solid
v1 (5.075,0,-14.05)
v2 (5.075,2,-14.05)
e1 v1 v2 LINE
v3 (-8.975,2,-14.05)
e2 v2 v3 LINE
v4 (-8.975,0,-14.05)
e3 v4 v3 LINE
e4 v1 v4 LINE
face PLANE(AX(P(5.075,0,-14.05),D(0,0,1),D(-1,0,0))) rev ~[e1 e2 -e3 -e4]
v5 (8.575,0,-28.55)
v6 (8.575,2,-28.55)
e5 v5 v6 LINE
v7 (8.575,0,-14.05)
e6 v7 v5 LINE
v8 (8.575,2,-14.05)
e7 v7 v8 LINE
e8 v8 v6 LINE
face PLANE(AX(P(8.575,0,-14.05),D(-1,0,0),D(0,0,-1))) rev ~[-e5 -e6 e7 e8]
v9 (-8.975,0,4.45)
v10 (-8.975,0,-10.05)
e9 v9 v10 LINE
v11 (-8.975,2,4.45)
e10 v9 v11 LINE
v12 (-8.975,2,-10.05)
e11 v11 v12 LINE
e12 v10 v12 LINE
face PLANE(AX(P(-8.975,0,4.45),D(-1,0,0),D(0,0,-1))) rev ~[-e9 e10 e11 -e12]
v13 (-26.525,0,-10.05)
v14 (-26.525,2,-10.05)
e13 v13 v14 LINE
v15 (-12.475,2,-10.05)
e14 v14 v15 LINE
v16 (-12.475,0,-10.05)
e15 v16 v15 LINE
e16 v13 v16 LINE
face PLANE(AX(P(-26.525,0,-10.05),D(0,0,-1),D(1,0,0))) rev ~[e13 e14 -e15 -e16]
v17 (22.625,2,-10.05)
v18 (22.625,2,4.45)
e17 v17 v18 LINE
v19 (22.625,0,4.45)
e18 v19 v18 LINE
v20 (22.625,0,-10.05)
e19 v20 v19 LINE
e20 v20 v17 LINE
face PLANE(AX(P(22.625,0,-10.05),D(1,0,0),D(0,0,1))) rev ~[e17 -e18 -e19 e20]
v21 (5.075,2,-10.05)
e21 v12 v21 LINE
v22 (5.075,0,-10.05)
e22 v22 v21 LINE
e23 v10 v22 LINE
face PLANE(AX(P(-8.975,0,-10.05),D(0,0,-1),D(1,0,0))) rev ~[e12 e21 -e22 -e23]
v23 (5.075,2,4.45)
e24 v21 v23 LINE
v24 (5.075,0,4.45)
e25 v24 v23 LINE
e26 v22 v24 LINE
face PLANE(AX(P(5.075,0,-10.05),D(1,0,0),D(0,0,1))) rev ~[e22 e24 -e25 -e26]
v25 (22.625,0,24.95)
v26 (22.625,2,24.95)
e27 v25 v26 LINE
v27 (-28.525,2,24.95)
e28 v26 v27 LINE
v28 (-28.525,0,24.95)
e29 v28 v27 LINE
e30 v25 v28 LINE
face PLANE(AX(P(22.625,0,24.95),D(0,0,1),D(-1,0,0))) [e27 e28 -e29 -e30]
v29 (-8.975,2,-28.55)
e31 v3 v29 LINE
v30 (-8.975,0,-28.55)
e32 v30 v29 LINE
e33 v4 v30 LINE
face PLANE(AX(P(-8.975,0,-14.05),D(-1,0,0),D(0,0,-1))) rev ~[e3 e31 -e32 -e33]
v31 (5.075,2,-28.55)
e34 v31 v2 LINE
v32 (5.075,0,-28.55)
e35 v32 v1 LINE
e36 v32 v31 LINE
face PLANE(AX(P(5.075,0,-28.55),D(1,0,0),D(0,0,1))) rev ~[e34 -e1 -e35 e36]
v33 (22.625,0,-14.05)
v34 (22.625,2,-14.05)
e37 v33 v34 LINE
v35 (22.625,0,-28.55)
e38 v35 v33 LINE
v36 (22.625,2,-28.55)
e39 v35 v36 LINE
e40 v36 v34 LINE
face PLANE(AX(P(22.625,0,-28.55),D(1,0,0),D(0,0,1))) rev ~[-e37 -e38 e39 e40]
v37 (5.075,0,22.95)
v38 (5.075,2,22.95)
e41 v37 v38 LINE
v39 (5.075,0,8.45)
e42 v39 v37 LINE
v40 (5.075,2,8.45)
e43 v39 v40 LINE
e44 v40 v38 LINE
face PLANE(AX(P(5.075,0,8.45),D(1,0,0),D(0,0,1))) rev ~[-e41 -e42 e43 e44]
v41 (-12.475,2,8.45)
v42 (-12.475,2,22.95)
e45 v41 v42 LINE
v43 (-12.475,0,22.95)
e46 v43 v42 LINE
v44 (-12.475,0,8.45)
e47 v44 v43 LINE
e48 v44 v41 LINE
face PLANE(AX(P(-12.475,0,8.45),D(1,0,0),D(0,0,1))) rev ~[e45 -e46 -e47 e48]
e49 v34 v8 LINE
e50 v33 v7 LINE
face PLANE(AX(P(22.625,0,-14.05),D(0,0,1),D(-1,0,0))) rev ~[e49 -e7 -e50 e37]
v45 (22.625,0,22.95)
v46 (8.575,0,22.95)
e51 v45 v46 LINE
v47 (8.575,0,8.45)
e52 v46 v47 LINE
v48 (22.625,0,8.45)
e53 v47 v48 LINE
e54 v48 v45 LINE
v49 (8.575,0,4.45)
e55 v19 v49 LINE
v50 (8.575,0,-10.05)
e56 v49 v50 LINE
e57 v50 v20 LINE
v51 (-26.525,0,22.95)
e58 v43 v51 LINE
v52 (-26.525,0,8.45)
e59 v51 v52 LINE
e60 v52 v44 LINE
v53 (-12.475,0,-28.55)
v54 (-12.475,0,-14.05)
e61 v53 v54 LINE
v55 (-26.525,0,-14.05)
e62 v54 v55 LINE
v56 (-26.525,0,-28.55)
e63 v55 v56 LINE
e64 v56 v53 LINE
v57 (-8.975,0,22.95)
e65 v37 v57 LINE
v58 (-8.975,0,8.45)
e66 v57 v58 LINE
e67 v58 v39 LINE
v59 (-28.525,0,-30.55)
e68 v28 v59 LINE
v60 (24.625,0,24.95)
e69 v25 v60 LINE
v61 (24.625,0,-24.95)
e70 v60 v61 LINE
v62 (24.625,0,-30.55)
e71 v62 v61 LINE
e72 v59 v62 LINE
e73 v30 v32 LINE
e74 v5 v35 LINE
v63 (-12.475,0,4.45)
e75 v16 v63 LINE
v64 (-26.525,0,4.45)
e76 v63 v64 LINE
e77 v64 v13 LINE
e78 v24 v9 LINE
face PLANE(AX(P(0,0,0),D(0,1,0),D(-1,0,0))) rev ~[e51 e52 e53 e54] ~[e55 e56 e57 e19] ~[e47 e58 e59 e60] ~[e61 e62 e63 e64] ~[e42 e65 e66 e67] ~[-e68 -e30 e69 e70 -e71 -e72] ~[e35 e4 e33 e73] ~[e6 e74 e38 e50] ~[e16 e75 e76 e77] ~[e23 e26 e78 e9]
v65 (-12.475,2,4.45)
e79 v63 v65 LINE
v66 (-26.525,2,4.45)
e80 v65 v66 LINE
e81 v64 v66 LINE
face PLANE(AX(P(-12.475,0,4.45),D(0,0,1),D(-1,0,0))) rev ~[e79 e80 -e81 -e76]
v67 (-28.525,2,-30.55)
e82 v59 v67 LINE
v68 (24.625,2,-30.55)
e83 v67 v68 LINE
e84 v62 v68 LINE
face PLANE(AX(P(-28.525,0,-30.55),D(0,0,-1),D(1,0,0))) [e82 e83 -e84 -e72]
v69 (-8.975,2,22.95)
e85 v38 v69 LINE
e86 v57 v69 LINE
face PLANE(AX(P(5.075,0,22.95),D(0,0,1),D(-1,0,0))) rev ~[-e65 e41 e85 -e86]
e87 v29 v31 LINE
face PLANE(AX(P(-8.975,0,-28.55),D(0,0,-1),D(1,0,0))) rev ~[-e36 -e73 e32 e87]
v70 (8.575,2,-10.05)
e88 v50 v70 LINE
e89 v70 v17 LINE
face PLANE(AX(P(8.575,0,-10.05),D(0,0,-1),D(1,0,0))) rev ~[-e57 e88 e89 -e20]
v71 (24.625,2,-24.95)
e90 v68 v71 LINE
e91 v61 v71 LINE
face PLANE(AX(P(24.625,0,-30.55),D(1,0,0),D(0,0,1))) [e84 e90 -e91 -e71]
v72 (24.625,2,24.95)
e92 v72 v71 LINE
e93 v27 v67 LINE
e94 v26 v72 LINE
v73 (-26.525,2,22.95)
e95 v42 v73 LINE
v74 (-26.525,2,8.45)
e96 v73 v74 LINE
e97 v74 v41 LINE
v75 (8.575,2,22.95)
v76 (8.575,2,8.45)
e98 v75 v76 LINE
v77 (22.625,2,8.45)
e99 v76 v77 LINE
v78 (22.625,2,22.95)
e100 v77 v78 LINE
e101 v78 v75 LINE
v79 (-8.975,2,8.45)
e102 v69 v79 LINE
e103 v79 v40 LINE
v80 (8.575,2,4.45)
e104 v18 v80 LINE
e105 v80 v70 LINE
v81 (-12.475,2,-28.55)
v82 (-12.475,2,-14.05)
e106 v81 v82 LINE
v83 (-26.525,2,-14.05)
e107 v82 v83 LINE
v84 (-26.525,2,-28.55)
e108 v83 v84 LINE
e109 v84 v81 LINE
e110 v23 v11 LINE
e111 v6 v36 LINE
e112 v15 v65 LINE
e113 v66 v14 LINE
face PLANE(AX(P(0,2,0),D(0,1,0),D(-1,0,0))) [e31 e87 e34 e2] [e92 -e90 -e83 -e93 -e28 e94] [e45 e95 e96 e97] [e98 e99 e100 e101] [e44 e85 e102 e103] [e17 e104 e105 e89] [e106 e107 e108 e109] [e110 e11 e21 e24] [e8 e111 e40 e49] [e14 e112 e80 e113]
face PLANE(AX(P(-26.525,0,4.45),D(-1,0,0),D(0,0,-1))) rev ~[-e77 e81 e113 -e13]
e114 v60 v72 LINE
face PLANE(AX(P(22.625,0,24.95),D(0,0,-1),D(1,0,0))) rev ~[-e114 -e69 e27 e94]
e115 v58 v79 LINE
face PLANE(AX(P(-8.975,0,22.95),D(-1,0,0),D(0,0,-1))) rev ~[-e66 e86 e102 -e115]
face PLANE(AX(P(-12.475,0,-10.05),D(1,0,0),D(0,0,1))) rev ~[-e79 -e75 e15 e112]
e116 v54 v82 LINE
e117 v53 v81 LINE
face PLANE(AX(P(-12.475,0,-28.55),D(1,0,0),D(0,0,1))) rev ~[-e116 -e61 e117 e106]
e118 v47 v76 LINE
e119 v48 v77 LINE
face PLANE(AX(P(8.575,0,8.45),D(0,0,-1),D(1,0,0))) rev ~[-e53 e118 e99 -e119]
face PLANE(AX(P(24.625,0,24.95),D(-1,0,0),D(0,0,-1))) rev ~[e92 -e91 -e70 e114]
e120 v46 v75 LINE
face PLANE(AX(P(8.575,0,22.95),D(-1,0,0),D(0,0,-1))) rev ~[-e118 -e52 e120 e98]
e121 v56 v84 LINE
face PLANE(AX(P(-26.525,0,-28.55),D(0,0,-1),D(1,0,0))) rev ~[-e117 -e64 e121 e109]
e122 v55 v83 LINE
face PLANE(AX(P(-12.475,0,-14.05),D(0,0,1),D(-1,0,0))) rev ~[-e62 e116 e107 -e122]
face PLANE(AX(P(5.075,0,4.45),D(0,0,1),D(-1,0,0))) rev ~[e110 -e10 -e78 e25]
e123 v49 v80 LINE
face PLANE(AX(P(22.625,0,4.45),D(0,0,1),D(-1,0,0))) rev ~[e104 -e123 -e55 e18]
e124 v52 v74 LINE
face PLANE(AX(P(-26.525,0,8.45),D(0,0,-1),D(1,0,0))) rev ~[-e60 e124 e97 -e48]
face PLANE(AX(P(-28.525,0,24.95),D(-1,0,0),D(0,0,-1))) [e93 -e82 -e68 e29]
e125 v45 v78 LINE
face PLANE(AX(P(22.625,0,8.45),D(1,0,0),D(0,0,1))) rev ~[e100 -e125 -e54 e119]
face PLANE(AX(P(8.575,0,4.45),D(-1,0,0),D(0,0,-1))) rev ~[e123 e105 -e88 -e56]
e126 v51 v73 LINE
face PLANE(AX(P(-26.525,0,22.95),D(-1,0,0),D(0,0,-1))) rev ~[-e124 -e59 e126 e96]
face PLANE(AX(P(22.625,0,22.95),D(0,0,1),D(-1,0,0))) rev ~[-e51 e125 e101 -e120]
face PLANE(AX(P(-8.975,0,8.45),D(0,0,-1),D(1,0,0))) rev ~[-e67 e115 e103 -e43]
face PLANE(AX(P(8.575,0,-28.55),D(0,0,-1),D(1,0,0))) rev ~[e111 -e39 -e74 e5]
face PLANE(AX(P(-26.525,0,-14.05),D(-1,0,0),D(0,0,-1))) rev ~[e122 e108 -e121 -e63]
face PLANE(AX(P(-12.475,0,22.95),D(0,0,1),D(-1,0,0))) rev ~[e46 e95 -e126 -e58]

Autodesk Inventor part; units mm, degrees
ref_plane "YZ Plane" through (0, 0, 0) normal (1, 0, 0) x (0, 1, 0)
ref_plane "XZ Plane" through (0, 0, 0) normal (0, 1, 0) x (-1, 0, 0)
ref_plane "XY Plane" through (0, 0, 0) normal (0, 0, 1) x (1, 0, 0)
sketch "Sketch1" plane through (0, 0, 0) normal (0, 1, 0) x (-1, 0, 0)
  line L0 (-24.625, 24.95) -> (-24.625, -24.95)
  line L1 (24.625, 24.95) -> (-24.625, -24.95) construction
  line L2 (-24.625, 24.95) -> (24.625, -24.95) construction
  line L3 (-24.625, 22.95) -> (-22.625, 22.95) construction
  line L4 (-22.625, 24.95) -> (-22.625, 22.95) construction
  line L5 (-22.625, 22.95) -> (-8.575, 22.95)
  line L6 (-8.575, 22.95) -> (-8.575, 8.45)
  line L7 (-8.575, 8.45) -> (-22.625, 8.45)
  line L8 (-22.625, 8.45) -> (-22.625, 22.95)
  line L9 (-22.625, 8.45) -> (-22.625, 4.45) construction
  line L10 (-22.625, 4.45) -> (-8.575, 4.45)
  line L11 (-8.575, 4.45) -> (-8.575, -10.05)
  line L12 (-8.575, -10.05) -> (-22.625, -10.05)
  line L13 (-22.625, -10.05) -> (-22.625, 4.45)
  line L14 (-22.625, -10.05) -> (-22.625, -14.05) construction
  line L15 (-22.625, -14.05) -> (-8.575, -14.05)
  line L16 (-8.575, -14.05) -> (-8.575, -28.55)
  line L17 (-8.575, -28.55) -> (-22.625, -28.55)
  line L18 (-22.625, -28.55) -> (-22.625, -14.05)
  line L19 (-8.575, 22.95) -> (-5.075, 22.95) construction
  line L20 (-5.075, 22.95) -> (8.975, 22.95)
  line L21 (8.975, 22.95) -> (8.975, 8.45)
  line L22 (8.975, 8.45) -> (-5.075, 8.45)
  line L23 (-5.075, 8.45) -> (-5.075, 22.95)
  line L24 (-5.075, 8.45) -> (-5.075, 4.45)
  line L25 (-5.075, 4.45) -> (8.975, 4.45)
  line L26 (8.975, 4.45) -> (8.975, -10.05)
  line L27 (8.975, -10.05) -> (-5.075, -10.05)
  line L28 (-5.075, -10.05) -> (-5.075, 4.45)
  line L29 (-5.075, -10.05) -> (-5.075, -14.05) construction
  line L30 (-5.075, -14.05) -> (8.975, -14.05)
  line L31 (8.975, -14.05) -> (8.975, -28.55)
  line L32 (8.975, -28.55) -> (-5.075, -28.55)
  line L33 (-5.075, -28.55) -> (-5.075, -14.05)
  line L34 (8.975, 22.95) -> (12.475, 22.95) construction
  line L35 (12.475, 22.95) -> (26.525, 22.95)
  line L36 (26.525, 22.95) -> (26.525, 8.45)
  line L37 (26.525, 8.45) -> (12.475, 8.45)
  line L38 (12.475, 8.45) -> (12.475, 22.95)
  line L39 (8.975, 4.45) -> (12.475, 4.45) construction
  line L40 (12.475, 4.45) -> (26.525, 4.45)
  line L41 (26.525, 4.45) -> (26.525, -10.05)
  line L42 (26.525, -10.05) -> (12.475, -10.05)
  line L43 (12.475, -10.05) -> (12.475, 4.45)
  line L44 (12.475, -10.05) -> (12.475, -14.05) construction
  line L45 (12.475, -14.05) -> (26.525, -14.05)
  line L46 (26.525, -14.05) -> (26.525, -28.55)
  line L47 (26.525, -28.55) -> (12.475, -28.55)
  line L48 (12.475, -28.55) -> (12.475, -14.05)
  line L49 (-22.625, 24.95) -> (-24.625, 24.95)
  line L50 (-24.625, 24.95) -> (28.525, 24.95)
  line L51 (28.525, 24.95) -> (28.525, -30.55)
  line L52 (28.525, -30.55) -> (-24.625, -30.55)
  line L53 (-24.625, -30.55) -> (-24.625, 24.95)
  point P0 (0, 0)
  dimension "d3" = 2
  dimension "d4" = 14.5
  dimension "d5" = 14.05
  dimension "d6" = 4
  dimension "d7" = 14.5
  dimension "d8" = 14.05
  dimension "d9" = 4
  dimension "d10" = 14.5
  dimension "d11" = 14.05
  dimension "d12" = 2
  dimension "d13" = 3.5
  dimension "d14" = 14.5
  dimension "d15" = 14.05
  dimension "d16" = 4
  dimension "d17" = 14.5
  dimension "d18" = 14.05
  dimension "d19" = 4
  dimension "d20" = 14.5
  dimension "d21" = 3.5
  dimension "d22" = 14.05
  dimension "d23" = 3.5
  dimension "d24" = 14.5
  dimension "d25" = 4
  dimension "d26" = 14.5
  dimension "d27" = 55.5
  dimension "d28" = 53.15
  dimension "d29" = 14.05
  dimension "d32" = 14.5
extrude "Extrusion1" add sketch "Sketch1" along normal blind 2
properties part number "Keyframe3by3"
